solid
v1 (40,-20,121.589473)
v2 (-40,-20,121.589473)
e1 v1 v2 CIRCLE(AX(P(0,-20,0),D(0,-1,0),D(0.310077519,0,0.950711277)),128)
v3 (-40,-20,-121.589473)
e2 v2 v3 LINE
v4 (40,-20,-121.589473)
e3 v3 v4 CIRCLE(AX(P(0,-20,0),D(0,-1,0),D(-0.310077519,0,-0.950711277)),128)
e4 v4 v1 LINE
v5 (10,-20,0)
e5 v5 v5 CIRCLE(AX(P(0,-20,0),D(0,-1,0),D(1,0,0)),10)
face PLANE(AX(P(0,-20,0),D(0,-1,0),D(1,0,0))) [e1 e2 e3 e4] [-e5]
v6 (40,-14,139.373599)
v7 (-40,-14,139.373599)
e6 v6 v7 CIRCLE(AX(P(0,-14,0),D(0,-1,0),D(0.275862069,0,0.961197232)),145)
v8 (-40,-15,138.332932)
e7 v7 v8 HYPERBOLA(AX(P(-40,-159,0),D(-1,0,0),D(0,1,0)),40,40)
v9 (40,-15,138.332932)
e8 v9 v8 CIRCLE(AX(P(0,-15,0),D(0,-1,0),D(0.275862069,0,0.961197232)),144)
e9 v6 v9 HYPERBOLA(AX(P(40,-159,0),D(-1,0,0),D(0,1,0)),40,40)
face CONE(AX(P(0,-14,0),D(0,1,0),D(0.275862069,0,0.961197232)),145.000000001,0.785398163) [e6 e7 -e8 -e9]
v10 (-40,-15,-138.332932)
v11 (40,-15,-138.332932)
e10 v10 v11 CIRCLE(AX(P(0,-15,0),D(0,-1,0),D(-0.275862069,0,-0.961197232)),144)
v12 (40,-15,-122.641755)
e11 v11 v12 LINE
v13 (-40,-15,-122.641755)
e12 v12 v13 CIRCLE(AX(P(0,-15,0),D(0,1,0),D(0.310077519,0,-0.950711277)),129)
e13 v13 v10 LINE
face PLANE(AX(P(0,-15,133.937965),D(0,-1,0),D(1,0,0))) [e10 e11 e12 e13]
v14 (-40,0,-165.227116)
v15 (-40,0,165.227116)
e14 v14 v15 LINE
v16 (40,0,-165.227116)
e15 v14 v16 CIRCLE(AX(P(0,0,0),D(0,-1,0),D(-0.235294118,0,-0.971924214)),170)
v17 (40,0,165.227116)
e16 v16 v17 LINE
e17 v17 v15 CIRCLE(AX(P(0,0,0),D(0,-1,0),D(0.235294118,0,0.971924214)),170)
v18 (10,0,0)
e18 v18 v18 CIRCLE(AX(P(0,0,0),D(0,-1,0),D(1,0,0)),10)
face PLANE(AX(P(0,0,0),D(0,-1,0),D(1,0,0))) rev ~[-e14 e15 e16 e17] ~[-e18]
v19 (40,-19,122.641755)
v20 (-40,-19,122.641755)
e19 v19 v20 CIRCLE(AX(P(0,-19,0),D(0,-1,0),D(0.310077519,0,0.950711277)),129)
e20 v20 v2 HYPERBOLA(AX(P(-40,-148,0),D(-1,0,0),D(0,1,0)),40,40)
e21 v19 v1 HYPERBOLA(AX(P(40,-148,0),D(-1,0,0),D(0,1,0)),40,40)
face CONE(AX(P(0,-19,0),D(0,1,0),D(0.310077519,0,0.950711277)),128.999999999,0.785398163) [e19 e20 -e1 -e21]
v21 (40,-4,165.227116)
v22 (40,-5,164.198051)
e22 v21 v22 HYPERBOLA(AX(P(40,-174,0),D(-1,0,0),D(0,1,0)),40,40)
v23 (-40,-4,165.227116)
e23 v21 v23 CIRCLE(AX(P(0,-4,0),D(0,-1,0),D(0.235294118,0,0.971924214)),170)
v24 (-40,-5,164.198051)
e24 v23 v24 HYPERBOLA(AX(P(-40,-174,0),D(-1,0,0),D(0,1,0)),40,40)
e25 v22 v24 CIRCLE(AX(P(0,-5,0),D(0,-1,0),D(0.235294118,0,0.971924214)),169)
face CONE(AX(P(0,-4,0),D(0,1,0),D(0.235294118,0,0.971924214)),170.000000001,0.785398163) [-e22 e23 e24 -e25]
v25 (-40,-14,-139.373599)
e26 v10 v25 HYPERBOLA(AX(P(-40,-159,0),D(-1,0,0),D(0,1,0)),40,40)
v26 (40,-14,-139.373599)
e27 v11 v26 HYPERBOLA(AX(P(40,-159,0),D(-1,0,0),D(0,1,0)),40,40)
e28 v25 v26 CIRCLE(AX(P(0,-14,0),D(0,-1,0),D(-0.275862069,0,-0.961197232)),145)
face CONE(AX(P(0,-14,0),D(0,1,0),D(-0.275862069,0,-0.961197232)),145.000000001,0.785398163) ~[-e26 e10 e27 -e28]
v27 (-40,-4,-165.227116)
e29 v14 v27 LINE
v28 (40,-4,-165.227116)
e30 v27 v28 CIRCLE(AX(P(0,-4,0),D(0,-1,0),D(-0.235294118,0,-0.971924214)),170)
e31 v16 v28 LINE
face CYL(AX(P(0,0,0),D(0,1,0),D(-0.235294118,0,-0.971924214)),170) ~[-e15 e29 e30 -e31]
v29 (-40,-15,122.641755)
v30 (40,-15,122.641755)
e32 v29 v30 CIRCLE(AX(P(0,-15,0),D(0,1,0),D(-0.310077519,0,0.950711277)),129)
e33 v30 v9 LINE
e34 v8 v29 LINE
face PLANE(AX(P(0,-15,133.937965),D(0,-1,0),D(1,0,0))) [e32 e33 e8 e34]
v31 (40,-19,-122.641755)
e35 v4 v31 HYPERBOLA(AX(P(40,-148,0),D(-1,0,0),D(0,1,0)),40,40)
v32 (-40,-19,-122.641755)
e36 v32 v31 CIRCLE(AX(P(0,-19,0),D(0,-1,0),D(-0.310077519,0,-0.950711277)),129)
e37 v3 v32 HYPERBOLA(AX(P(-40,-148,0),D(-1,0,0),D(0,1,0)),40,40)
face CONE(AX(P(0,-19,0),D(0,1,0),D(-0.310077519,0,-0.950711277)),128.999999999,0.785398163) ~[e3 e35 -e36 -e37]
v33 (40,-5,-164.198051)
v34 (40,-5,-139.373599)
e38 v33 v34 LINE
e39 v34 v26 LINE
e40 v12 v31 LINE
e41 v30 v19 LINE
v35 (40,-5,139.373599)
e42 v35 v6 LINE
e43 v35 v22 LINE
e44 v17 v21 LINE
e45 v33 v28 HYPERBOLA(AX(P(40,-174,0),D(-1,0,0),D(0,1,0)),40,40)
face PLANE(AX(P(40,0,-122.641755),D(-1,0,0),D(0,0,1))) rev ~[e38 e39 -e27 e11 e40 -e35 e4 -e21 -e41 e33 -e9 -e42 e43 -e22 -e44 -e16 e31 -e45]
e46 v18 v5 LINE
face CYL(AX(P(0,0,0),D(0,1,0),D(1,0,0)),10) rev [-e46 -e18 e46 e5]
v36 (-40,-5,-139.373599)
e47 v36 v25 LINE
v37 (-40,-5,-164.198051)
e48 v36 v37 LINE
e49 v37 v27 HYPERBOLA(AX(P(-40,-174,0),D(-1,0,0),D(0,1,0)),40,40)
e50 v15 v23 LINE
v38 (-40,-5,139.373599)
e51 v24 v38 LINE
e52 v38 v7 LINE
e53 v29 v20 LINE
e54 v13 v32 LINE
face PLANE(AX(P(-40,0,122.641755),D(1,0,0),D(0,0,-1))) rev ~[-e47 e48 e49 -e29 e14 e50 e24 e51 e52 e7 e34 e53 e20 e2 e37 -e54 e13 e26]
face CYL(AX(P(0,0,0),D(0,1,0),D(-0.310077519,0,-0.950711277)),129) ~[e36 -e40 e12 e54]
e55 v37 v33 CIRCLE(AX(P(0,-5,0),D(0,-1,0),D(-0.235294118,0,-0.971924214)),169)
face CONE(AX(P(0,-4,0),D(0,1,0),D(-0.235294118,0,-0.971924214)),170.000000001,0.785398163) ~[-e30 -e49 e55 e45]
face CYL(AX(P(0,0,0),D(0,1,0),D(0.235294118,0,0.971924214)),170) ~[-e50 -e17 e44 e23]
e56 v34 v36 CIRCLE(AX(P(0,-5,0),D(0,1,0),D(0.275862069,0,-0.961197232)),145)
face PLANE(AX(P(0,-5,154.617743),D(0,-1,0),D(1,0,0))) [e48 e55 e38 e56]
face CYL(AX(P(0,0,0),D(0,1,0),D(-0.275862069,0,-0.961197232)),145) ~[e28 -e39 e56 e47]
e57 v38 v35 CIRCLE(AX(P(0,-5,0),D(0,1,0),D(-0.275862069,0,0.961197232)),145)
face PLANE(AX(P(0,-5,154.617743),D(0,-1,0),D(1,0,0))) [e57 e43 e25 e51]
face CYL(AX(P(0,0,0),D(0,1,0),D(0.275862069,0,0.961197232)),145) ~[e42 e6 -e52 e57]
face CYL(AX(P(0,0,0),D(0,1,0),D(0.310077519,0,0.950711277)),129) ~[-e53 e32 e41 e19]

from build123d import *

# Parameters (mm, degrees)
F1_DEPTH = 5
F2_DEPTH = 15
F0_R     = 10
F3_DEPTH = 20
F4_DEPTH = 30
F5_SIZE  = 1


with BuildPart() as f1:
    # F0 (on Front) → F1 (new body)
    with BuildSketch(Plane.XZ):
        with BuildLine():
            Line((40, 139.3735986477), (40, 165.2271164186))
            ThreePointArc((40, 165.2271164186), (0, 170), (-40, 165.2271164186))
            Line((-40, 165.2271164186), (-40, 139.3735986477))
            ThreePointArc((-40, 139.3735986477), (0, 145), (40, 139.3735986477))
        make_face()
        with BuildLine():
            Line((-40, 139.3735986477), (-40, 165.2271164186))
            ThreePointArc((-40, 165.2271164186), (-170, 0), (-40, -165.2271164186))
            Line((-40, -165.2271164186), (-40, -139.3735986477))
            ThreePointArc((-40, -139.3735986477), (-145, 0), (-40, 139.3735986477))
        make_face()
        with BuildLine():
            ThreePointArc((-40, -165.2271164186), (0, -170), (40, -165.2271164186))
            Line((40, -165.2271164186), (40, -139.3735986477))
            ThreePointArc((40, -139.3735986477), (0, -145), (-40, -139.3735986477))
            Line((-40, -139.3735986477), (-40, -165.2271164186))
        make_face()
        with BuildLine():
            ThreePointArc((40, -165.2271164186), (133.6038921589, -105.1189802081), (170, 0))
            ThreePointArc((170, 0), (133.6038921589, 105.1189802081), (40, 165.2271164186))
            Line((40, 165.2271164186), (40, 139.3735986477))
            ThreePointArc((40, 139.3735986477), (115.812348219, 87.2496418331), (145, 0))
            ThreePointArc((145, 0), (115.812348219, -87.2496418331), (40, -139.3735986477))
            Line((40, -139.3735986477), (40, -165.2271164186))
        make_face()
    extrude(amount=F1_DEPTH)

    # F0 (on Front) → F2 (join)
    with BuildSketch(Plane.XZ):
        with BuildLine():
            Line((40, 122.6417547167), (40, 139.3735986477))
            ThreePointArc((40, 139.3735986477), (0, 145), (-40, 139.3735986477))
            Line((-40, 139.3735986477), (-40, 122.6417547167))
            ThreePointArc((-40, 122.6417547167), (0, 129), (40, 122.6417547167))
        make_face()
        with BuildLine():
            Line((-40, 122.6417547167), (-40, 139.3735986477))
            ThreePointArc((-40, 139.3735986477), (-145, 0), (-40, -139.3735986477))
            Line((-40, -139.3735986477), (-40, -122.6417547167))
            ThreePointArc((-40, -122.6417547167), (-129, 0), (-40, 122.6417547167))
        make_face()
        with BuildLine():
            ThreePointArc((-40, -139.3735986477), (0, -145), (40, -139.3735986477))
            Line((40, -139.3735986477), (40, -122.6417547167))
            ThreePointArc((40, -122.6417547167), (0, -129), (-40, -122.6417547167))
            Line((-40, -122.6417547167), (-40, -139.3735986477))
        make_face()
        with BuildLine():
            ThreePointArc((145, 0), (115.812348219, 87.2496418331), (40, 139.3735986477))
            Line((40, 139.3735986477), (40, 122.6417547167))
            ThreePointArc((40, 122.6417547167), (104.4054596274, 75.7660874006), (129, 0))
            ThreePointArc((129, 0), (104.4054596274, -75.7660874006), (40, -122.6417547167))
            Line((40, -122.6417547167), (40, -139.3735986477))
            ThreePointArc((40, -139.3735986477), (115.812348219, -87.2496418331), (145, 0))
        make_face()
    extrude(amount=F2_DEPTH)

    # F0 (on Front) → F3 (join)
    with BuildSketch(Plane.XZ):
        with BuildLine():
            Line((40, -122.6417547167), (40, 122.6417547167))
            ThreePointArc((40, 122.6417547167), (0, 129), (-40, 122.6417547167))
            Line((-40, 122.6417547167), (-40, -122.6417547167))
            ThreePointArc((-40, -122.6417547167), (0, -129), (40, -122.6417547167))
        make_face()
        Circle(F0_R, mode=Mode.SUBTRACT)
    extrude(amount=F3_DEPTH)

    # F0 (on Front) → F4 (cut)
    with BuildSketch(Plane.XZ):
        with BuildLine():
            ThreePointArc((40, -165.2271164186), (133.6038921589, -105.1189802081), (170, 0))
            ThreePointArc((170, 0), (133.6038921589, 105.1189802081), (40, 165.2271164186))
            Line((40, 165.2271164186), (40, 139.3735986477))
            ThreePointArc((40, 139.3735986477), (115.812348219, 87.2496418331), (145, 0))
            ThreePointArc((145, 0), (115.812348219, -87.2496418331), (40, -139.3735986477))
            Line((40, -139.3735986477), (40, -165.2271164186))
        make_face()
        with BuildLine():
            Line((-40, 139.3735986477), (-40, 165.2271164186))
            ThreePointArc((-40, 165.2271164186), (-170, 0), (-40, -165.2271164186))
            Line((-40, -165.2271164186), (-40, -139.3735986477))
            ThreePointArc((-40, -139.3735986477), (-145, 0), (-40, 139.3735986477))
        make_face()
        with BuildLine():
            ThreePointArc((145, 0), (115.812348219, 87.2496418331), (40, 139.3735986477))
            Line((40, 139.3735986477), (40, 122.6417547167))
            ThreePointArc((40, 122.6417547167), (104.4054596274, 75.7660874006), (129, 0))
            ThreePointArc((129, 0), (104.4054596274, -75.7660874006), (40, -122.6417547167))
            Line((40, -122.6417547167), (40, -139.3735986477))
            ThreePointArc((40, -139.3735986477), (115.812348219, -87.2496418331), (145, 0))
        make_face()
        with BuildLine():
            Line((-40, 122.6417547167), (-40, 139.3735986477))
            ThreePointArc((-40, 139.3735986477), (-145, 0), (-40, -139.3735986477))
            Line((-40, -139.3735986477), (-40, -122.6417547167))
            ThreePointArc((-40, -122.6417547167), (-129, 0), (-40, 122.6417547167))
        make_face()
        with BuildLine():
            ThreePointArc((129, 0), (104.4054596274, 75.7660874006), (40, 122.6417547167))
            Line((40, 122.6417547167), (40, -122.6417547167))
            ThreePointArc((40, -122.6417547167), (104.4054596274, -75.7660874006), (129, 0))
        make_face()
    extrude(amount=F4_DEPTH, mode=Mode.SUBTRACT)

    # F5
    f5_edges = [f1.edges().sort_by_distance(p)[0] for p in [
        (0, -20, -129),
        (0, -15, -145),
        (0, -15, 145),
        (0, -5, 170),
        (0, -5, -170),
        (0, -20, 129),
    ]]
    chamfer(f5_edges, length=F5_SIZE)


solid = f1.part
